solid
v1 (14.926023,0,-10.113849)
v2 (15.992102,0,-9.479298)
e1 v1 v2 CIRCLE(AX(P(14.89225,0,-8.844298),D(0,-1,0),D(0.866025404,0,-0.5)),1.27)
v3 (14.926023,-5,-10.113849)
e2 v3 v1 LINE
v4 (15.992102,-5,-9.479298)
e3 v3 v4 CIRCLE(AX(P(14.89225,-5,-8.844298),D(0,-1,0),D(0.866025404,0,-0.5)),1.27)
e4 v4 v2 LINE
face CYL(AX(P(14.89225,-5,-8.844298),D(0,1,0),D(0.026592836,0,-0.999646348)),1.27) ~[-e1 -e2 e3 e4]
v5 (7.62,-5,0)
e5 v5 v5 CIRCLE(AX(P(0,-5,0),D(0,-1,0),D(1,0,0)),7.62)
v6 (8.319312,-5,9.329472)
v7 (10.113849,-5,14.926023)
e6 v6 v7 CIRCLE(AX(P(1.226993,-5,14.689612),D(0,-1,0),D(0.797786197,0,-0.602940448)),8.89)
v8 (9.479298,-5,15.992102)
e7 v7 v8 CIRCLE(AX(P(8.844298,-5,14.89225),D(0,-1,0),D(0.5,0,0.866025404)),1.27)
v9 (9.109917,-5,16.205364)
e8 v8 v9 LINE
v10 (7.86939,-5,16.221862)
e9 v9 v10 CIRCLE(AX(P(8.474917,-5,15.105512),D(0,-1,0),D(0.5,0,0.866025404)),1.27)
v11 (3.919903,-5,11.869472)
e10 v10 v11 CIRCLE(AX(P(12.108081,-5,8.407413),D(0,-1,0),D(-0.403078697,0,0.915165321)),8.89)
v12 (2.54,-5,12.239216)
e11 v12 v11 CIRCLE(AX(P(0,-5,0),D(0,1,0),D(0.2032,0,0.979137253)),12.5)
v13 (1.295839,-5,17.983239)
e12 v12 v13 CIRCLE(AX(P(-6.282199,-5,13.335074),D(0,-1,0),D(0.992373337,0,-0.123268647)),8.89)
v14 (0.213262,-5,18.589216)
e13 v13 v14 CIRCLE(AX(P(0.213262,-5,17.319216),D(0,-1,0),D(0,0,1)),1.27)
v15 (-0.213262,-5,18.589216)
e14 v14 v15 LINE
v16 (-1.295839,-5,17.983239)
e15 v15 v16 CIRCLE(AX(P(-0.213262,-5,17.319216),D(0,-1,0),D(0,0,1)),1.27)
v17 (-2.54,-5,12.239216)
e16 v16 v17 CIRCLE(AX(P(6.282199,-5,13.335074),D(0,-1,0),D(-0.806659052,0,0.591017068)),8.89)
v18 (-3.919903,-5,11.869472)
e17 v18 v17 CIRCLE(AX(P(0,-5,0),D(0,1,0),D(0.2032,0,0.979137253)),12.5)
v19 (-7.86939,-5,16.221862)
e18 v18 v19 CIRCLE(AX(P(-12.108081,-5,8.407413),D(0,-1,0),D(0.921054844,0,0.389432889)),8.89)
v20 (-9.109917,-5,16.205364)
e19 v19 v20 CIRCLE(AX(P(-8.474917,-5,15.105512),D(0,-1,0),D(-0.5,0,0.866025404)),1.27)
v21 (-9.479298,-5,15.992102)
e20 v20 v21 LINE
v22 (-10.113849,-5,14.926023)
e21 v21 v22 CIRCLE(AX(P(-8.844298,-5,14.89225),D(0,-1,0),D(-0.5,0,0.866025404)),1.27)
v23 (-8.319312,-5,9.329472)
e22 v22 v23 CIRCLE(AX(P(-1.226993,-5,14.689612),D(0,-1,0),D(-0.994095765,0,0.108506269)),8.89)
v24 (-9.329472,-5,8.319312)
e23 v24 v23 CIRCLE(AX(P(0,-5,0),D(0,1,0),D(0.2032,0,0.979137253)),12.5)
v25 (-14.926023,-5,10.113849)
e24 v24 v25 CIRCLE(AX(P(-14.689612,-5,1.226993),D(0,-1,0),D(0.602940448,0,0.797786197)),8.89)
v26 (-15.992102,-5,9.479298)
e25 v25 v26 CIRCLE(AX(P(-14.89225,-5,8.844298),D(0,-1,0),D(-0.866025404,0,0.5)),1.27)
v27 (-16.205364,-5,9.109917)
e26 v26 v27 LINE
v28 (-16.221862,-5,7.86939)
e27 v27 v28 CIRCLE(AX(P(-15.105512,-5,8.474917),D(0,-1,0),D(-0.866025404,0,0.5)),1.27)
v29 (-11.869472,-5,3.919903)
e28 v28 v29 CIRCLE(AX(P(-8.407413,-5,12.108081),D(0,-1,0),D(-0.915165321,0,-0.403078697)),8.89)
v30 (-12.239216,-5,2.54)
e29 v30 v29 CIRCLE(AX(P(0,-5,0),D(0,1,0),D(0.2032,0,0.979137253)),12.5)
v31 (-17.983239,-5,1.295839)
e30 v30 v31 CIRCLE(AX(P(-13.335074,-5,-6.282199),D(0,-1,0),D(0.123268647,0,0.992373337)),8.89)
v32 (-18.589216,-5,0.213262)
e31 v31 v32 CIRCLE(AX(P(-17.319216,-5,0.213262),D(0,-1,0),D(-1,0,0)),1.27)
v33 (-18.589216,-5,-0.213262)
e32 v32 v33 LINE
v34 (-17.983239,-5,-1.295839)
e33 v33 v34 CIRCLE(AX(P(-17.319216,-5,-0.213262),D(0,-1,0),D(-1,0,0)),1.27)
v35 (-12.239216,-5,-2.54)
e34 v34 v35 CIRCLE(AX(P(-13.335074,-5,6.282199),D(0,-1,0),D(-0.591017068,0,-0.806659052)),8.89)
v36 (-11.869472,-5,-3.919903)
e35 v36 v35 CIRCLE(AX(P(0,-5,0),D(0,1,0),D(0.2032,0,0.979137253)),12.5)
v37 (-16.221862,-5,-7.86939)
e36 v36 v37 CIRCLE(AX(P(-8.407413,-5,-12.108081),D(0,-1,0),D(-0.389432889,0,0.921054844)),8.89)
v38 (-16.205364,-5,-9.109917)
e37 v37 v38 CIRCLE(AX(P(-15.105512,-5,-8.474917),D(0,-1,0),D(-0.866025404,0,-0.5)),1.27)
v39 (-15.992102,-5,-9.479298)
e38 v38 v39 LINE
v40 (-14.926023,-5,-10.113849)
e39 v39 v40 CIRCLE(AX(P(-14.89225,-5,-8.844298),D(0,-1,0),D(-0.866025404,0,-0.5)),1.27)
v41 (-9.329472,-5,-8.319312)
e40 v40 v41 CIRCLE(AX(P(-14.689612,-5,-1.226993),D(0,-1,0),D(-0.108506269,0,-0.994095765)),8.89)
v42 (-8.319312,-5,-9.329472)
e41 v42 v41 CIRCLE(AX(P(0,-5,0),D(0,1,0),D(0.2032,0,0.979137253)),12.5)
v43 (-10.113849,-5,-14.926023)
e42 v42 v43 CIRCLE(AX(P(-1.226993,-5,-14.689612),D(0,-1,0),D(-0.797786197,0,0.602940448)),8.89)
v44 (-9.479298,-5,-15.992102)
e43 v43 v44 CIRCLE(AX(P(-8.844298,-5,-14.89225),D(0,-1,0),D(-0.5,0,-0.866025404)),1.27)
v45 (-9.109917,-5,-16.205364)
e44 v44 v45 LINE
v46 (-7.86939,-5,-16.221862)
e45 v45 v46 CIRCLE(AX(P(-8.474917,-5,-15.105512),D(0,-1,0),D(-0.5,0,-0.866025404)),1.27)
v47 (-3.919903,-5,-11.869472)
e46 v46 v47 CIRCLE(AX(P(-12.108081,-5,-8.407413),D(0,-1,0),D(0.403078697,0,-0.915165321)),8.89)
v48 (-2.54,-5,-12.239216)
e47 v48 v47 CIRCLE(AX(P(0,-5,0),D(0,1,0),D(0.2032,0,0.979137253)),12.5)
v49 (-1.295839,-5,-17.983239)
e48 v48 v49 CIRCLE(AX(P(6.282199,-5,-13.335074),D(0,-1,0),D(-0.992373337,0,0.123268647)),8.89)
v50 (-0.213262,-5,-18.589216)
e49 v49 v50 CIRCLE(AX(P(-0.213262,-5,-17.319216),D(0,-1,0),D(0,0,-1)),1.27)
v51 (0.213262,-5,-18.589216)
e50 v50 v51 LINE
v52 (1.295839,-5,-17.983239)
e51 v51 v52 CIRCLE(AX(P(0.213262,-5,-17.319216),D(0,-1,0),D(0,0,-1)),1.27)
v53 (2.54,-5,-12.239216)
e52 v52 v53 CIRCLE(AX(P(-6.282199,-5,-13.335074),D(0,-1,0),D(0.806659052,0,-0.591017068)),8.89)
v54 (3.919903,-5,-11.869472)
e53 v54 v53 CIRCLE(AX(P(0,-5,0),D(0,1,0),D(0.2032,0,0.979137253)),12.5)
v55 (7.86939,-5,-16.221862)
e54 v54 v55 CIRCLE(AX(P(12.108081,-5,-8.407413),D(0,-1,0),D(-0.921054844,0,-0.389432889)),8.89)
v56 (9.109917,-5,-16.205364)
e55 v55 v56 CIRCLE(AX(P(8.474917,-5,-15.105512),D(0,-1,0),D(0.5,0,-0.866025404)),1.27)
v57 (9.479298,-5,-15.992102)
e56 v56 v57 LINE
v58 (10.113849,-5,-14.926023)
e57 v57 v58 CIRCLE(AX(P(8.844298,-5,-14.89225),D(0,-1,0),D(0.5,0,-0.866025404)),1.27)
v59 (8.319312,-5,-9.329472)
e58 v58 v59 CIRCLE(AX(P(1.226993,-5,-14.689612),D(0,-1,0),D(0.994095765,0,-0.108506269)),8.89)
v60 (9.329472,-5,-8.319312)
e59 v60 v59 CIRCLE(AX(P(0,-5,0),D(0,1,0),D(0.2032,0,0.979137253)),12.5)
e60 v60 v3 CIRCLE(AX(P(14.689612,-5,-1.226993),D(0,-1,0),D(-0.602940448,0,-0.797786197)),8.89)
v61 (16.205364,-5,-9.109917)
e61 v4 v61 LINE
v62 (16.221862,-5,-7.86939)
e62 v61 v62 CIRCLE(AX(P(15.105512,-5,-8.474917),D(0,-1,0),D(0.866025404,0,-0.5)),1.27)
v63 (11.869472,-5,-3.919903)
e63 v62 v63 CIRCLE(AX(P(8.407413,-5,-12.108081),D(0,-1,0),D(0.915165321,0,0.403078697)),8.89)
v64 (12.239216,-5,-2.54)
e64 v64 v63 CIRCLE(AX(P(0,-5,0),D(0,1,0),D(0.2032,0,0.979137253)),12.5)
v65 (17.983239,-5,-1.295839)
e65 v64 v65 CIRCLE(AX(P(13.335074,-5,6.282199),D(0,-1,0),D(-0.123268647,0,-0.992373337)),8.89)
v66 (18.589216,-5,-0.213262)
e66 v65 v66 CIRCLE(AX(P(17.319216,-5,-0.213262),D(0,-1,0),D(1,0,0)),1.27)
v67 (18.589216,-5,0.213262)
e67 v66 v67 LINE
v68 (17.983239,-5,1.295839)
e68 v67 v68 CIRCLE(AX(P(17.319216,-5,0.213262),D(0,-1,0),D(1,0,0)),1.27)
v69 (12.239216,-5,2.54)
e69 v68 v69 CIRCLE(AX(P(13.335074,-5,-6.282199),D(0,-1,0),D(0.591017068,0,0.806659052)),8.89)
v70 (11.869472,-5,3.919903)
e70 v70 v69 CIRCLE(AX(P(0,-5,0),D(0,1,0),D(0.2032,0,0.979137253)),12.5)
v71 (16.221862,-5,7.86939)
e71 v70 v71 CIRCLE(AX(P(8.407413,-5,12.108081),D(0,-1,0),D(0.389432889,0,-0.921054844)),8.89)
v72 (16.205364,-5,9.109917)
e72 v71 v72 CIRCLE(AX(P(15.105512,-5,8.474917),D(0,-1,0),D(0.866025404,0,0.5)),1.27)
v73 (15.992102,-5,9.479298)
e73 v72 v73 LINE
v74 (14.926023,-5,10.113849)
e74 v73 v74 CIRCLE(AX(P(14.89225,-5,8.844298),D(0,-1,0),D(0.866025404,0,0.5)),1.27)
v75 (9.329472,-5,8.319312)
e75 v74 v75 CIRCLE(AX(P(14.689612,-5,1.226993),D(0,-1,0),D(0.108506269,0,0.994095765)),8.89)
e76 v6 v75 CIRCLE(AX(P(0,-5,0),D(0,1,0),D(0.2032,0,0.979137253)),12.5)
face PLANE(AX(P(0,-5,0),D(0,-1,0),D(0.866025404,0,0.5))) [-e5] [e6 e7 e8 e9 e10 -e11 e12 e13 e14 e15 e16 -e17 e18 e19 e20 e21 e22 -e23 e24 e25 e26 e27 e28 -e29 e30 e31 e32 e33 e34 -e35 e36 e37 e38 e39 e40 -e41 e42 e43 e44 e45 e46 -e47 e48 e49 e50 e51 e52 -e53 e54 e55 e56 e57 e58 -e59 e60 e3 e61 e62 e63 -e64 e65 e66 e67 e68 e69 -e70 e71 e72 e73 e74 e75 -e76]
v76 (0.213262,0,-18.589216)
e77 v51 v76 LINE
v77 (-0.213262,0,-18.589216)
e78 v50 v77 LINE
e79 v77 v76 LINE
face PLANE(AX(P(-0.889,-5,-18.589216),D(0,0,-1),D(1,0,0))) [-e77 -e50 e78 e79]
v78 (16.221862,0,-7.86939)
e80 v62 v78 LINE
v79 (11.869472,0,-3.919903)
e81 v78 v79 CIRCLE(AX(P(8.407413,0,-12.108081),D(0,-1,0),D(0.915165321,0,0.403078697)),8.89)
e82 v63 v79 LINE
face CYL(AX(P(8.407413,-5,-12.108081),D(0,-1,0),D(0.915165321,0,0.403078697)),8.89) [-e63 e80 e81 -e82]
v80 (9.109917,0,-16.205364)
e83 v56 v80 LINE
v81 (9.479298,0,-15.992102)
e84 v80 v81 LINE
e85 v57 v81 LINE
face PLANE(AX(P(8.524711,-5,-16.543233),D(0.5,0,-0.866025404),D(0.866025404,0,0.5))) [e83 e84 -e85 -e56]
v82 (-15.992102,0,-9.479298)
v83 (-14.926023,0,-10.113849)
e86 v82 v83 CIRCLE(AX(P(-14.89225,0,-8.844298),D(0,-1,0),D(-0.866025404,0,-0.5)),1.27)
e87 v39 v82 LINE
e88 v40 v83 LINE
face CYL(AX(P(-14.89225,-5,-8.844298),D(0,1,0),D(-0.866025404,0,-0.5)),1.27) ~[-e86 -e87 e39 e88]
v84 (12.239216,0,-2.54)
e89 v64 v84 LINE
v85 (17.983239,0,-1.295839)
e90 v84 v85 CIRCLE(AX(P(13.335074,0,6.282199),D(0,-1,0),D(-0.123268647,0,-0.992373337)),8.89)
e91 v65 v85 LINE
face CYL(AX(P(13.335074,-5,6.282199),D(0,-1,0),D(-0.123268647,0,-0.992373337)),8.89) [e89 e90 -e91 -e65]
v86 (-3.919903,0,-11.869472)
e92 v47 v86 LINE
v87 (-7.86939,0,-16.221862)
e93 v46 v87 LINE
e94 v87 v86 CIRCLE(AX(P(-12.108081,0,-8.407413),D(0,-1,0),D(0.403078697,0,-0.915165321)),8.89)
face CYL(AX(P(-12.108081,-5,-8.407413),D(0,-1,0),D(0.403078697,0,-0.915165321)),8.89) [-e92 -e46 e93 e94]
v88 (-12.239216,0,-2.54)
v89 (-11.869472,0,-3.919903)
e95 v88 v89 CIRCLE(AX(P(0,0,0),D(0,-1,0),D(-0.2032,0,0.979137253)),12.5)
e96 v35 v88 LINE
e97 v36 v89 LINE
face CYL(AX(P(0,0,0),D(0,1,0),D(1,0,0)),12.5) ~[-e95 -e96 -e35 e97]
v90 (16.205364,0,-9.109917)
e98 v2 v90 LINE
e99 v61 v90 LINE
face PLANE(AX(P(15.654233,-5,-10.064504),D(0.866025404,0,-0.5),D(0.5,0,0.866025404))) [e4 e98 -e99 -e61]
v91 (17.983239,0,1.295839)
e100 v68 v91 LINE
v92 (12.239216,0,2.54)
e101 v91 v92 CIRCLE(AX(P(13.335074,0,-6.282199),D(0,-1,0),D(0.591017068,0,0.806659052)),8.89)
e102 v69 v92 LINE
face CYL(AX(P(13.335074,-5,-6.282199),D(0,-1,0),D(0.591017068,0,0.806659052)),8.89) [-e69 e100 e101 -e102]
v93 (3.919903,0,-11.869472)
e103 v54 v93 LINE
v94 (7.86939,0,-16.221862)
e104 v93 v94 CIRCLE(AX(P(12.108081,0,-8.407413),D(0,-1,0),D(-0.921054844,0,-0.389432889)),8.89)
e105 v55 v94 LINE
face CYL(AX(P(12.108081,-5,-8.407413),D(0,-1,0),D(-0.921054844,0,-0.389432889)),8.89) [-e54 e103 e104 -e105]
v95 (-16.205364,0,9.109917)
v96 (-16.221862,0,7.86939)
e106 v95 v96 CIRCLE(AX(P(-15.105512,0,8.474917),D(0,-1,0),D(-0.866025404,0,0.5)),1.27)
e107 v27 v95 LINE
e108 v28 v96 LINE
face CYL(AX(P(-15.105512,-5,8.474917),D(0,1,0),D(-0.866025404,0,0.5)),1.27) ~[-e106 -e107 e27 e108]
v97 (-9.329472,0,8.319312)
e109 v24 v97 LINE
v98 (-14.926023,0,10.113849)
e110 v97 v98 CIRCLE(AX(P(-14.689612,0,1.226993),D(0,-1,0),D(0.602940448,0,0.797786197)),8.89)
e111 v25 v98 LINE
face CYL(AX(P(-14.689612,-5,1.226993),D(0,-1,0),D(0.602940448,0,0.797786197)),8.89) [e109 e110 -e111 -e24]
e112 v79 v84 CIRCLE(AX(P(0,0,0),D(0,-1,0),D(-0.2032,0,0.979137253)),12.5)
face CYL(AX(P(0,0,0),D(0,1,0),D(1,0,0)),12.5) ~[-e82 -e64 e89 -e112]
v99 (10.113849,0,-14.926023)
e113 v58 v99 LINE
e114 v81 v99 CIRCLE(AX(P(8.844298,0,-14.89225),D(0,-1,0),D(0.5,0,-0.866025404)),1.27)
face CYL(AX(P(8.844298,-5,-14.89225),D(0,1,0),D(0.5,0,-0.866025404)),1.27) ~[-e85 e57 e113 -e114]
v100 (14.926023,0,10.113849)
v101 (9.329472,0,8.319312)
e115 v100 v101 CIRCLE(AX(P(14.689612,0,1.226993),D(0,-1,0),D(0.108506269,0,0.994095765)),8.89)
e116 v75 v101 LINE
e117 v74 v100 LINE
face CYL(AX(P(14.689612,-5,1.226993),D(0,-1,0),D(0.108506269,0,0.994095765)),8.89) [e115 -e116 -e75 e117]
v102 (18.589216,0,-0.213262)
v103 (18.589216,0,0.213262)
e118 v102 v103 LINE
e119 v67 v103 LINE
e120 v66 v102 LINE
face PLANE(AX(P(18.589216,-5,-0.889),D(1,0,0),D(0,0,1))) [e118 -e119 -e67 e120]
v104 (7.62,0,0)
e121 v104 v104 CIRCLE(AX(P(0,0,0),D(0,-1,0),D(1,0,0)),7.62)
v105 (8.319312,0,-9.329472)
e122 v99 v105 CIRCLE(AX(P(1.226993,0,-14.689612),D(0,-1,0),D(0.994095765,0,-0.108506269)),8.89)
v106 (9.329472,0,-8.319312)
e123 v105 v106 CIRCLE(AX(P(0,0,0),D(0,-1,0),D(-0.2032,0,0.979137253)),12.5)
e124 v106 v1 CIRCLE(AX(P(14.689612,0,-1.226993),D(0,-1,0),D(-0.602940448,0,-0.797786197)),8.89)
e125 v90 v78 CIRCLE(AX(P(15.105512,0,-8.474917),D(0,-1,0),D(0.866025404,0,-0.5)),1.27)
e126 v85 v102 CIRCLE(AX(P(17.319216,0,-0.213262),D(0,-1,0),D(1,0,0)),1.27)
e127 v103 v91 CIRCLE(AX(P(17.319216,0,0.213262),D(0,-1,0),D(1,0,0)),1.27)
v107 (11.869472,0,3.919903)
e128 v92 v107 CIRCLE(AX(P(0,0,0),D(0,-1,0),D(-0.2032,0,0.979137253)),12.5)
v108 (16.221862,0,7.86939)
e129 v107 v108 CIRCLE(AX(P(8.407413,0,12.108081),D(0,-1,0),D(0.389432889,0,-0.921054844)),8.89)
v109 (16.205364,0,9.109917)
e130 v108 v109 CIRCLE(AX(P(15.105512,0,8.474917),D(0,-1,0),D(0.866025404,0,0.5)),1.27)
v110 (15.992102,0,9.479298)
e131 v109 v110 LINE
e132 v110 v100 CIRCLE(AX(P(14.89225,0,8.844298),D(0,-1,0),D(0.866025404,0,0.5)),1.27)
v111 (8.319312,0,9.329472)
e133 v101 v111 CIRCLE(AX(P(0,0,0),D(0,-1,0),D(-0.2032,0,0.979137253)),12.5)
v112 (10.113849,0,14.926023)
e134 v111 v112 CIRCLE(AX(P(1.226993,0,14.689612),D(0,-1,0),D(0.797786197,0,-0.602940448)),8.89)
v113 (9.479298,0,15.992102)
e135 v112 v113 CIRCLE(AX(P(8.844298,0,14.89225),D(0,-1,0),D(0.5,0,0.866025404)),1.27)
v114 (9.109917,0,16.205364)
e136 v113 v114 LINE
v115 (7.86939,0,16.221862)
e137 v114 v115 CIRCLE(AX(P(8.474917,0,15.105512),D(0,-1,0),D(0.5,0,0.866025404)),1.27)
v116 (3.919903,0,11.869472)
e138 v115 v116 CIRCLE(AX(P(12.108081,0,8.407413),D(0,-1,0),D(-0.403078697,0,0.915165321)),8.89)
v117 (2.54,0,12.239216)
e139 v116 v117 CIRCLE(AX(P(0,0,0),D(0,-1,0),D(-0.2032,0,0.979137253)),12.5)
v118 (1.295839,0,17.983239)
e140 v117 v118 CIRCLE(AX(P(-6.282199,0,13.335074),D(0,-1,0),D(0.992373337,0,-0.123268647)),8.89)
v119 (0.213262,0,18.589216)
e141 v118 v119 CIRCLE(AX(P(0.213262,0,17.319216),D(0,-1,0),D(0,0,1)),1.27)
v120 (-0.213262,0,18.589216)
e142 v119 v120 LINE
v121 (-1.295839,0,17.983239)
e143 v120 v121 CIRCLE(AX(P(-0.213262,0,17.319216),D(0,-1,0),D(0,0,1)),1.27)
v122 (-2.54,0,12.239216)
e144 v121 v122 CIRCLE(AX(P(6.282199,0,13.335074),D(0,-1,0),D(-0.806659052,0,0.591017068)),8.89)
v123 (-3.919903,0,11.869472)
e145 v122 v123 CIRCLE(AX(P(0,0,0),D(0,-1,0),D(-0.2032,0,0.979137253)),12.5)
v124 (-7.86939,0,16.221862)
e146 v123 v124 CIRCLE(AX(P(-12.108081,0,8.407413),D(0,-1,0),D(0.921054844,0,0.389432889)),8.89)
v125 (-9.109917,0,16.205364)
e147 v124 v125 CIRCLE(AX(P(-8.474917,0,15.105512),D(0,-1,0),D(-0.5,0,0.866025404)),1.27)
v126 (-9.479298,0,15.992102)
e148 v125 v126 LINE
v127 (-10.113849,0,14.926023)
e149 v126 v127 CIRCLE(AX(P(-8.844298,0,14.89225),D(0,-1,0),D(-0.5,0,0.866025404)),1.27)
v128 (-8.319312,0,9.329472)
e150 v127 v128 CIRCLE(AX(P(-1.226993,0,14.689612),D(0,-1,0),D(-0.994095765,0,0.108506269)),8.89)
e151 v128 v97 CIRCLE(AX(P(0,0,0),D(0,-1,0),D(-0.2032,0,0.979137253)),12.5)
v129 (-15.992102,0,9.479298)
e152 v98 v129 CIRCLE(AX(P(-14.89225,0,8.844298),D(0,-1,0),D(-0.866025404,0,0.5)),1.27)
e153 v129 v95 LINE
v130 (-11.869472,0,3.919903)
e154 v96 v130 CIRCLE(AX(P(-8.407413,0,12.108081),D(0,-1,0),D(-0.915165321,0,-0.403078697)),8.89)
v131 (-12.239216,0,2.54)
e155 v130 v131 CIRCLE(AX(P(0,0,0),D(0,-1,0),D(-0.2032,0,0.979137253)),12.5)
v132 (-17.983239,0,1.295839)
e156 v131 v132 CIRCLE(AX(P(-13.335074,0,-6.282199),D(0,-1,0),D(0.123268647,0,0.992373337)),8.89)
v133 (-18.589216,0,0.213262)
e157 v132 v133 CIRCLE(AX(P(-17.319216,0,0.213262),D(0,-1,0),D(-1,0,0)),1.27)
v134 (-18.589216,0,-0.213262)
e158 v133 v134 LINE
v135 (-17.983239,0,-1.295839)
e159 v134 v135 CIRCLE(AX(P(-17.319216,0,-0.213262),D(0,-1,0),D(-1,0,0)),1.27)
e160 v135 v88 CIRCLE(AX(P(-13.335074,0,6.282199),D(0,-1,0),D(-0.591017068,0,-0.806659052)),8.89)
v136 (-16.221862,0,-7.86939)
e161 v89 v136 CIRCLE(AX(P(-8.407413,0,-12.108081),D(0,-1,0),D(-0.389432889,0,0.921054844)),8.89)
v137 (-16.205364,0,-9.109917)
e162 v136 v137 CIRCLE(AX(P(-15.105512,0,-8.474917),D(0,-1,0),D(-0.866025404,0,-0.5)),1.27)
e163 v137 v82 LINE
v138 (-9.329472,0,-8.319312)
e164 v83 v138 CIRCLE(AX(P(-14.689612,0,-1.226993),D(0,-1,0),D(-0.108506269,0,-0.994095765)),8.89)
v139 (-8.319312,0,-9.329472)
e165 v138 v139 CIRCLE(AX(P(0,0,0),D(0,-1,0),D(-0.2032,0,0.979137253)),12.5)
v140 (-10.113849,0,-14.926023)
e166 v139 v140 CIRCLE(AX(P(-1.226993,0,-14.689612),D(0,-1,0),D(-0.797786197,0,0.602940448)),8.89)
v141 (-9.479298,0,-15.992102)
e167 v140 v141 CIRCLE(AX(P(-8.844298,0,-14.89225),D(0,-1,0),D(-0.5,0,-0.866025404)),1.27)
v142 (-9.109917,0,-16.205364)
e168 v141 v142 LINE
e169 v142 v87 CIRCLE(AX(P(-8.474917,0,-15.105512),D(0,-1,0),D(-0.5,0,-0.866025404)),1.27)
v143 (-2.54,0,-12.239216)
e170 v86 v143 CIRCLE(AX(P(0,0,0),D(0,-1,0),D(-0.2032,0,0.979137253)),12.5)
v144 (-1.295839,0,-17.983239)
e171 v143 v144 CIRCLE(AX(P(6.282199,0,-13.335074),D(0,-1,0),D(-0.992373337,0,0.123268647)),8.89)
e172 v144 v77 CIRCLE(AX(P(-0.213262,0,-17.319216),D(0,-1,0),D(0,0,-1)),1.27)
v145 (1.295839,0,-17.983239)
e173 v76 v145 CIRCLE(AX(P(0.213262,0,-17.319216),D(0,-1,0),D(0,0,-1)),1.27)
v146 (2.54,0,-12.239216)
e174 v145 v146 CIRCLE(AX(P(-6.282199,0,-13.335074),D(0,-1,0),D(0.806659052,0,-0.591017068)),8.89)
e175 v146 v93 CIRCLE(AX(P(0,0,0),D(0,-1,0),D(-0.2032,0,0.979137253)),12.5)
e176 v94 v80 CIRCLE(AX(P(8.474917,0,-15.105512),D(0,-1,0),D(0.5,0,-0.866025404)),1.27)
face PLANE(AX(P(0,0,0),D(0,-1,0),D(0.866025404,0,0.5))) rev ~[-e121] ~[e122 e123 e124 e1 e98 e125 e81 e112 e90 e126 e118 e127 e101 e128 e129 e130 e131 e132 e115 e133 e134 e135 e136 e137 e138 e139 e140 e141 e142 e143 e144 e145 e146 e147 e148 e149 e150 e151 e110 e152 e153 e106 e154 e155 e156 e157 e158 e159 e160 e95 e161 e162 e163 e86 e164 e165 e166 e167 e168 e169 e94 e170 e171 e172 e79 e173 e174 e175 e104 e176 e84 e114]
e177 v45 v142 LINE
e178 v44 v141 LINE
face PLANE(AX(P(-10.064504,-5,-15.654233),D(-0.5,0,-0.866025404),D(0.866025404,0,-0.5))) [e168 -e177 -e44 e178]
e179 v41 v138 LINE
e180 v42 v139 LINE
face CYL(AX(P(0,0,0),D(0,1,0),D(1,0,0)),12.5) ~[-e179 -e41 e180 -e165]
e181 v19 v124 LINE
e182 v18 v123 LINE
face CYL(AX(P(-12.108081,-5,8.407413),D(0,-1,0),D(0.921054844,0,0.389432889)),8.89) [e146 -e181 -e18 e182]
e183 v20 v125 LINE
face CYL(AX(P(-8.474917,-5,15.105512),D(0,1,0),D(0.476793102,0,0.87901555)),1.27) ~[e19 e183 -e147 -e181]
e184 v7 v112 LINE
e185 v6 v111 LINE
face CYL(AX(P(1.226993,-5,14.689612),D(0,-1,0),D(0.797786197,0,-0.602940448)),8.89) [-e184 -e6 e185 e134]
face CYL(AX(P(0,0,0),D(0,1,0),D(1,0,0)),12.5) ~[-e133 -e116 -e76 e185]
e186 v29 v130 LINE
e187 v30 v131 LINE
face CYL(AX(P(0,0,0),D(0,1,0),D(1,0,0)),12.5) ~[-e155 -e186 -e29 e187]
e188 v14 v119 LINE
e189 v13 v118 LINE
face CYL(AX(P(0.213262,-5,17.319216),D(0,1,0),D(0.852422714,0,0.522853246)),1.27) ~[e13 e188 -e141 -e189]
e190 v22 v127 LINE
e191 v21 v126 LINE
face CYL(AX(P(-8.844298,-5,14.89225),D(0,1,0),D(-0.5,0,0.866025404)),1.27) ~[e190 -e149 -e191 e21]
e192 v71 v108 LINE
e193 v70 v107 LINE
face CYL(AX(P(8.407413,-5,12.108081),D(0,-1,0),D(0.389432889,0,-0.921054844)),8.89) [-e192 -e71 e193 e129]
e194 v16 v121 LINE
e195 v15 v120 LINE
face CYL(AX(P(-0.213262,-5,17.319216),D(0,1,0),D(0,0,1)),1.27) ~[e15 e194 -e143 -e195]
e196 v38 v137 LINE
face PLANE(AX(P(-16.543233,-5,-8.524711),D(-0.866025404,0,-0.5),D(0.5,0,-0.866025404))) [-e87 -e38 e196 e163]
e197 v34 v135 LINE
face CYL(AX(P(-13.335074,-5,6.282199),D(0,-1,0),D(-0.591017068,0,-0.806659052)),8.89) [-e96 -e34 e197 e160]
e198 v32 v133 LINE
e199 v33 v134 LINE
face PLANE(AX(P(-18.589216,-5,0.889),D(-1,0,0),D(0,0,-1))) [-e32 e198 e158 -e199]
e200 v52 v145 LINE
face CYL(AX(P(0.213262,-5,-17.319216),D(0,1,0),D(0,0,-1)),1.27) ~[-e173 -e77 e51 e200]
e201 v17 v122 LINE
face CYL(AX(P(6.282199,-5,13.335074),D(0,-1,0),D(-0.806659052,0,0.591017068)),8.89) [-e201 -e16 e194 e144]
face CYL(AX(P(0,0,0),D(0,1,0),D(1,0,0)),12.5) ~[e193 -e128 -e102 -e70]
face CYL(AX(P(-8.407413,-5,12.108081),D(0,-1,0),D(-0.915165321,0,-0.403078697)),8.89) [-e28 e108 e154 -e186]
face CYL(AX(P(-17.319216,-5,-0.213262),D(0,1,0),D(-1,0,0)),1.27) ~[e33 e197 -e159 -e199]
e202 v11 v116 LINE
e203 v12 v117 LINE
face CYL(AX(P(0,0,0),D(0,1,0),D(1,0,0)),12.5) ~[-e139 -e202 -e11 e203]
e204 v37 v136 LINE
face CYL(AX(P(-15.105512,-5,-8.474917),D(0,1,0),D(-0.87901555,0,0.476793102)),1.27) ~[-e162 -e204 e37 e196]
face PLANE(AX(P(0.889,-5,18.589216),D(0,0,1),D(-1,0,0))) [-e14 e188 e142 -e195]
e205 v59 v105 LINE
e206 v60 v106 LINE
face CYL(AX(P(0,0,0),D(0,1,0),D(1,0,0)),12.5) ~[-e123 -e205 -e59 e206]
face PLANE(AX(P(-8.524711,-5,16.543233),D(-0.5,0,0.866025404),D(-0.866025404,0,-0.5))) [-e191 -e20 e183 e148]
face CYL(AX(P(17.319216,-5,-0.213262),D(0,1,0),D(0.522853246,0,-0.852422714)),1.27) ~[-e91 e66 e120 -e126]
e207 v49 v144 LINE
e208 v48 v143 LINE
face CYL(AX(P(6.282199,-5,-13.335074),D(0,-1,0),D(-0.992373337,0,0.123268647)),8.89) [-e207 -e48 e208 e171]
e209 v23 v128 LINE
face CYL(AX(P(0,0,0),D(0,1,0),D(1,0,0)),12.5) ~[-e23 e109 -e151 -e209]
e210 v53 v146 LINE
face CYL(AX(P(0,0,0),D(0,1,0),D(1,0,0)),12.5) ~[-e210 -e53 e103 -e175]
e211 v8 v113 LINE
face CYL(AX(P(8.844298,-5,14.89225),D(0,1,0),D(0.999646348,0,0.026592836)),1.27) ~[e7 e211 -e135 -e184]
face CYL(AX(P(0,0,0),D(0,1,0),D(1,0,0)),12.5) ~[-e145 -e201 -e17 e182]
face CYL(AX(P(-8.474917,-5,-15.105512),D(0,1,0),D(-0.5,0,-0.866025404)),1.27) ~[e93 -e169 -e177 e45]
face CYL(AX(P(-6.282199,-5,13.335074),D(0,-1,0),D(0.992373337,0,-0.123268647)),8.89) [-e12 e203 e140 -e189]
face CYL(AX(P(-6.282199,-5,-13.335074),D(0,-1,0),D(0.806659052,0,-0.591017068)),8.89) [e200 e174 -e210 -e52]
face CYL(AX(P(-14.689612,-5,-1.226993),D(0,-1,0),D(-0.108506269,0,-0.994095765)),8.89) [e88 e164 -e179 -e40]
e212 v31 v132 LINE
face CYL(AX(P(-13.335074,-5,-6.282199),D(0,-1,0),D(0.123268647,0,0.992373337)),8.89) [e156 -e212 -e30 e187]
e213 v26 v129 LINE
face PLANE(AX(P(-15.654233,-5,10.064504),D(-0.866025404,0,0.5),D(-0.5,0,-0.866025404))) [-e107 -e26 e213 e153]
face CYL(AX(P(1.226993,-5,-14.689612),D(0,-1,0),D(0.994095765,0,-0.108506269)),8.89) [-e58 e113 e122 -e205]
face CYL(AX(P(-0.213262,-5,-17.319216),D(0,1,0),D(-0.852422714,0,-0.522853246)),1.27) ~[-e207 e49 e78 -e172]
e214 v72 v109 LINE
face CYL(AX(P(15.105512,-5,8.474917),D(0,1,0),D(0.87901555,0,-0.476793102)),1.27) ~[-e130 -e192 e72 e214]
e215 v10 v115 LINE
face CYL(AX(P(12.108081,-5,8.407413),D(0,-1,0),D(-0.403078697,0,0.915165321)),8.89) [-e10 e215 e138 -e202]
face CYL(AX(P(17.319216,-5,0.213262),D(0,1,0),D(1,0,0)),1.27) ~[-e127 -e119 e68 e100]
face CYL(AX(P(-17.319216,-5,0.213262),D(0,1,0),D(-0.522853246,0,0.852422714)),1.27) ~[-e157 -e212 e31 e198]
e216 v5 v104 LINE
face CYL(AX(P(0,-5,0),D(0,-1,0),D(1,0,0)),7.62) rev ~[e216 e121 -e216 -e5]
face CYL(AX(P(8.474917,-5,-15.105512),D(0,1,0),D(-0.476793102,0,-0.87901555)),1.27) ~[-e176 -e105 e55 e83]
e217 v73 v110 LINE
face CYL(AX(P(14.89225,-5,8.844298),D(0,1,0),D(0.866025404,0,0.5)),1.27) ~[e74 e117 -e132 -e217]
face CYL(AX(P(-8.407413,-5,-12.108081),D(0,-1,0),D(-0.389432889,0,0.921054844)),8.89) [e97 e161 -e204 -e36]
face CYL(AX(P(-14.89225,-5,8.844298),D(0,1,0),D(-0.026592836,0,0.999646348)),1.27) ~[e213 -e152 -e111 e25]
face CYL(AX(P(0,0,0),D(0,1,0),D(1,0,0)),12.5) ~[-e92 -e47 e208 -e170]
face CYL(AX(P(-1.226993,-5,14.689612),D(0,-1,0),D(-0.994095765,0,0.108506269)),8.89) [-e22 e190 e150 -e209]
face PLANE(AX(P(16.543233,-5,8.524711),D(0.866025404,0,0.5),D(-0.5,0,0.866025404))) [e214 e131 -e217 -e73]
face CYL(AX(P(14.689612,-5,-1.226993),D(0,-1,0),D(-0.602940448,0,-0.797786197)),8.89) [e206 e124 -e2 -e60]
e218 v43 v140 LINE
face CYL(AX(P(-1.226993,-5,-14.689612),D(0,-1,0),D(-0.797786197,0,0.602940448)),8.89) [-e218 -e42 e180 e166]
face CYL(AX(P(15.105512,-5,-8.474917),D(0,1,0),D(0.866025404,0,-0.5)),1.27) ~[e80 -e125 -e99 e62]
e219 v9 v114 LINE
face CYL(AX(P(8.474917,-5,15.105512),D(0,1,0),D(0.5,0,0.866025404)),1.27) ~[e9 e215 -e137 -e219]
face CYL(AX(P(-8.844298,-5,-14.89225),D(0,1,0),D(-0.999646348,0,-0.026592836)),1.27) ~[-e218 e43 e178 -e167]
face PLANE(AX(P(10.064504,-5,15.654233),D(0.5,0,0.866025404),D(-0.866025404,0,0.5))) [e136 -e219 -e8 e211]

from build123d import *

# Parameters (mm, degrees)
F0_R     = 12.5
F1_DEPTH = 5
F3_DEPTH = 5
F4_R     = 1.27
F5_COUNT = 12
F6_R     = 7.62
F7_DEPTH = 25.4


with BuildPart() as f1:
    # F0 (on Front) → F1 (new body)
    with BuildSketch(Plane.XZ):
        Circle(F0_R)
    extrude(amount=F1_DEPTH)

    # F2 (on face) → F3 (join, through all)
    with BuildSketch(Plane.XZ.offset(5)):
        with BuildLine():
            ThreePointArc((-2.54, 12.2392156611), (0, 12.5), (2.54, 12.2392156611))
            ThreePointArc((2.54, 12.2392156611), (2.3217431159, 15.5720988713), (0.889, 18.5892156611))
            Line((0.889, 18.5892156611), (-0.889, 18.5892156611))
            ThreePointArc((-0.889, 18.5892156611), (-2.3217431159, 15.5720988713), (-2.54, 12.2392156611))
        make_face()
    extrude(amount=-F3_DEPTH)

    # F4
    f4_edges = [f1.edges().sort_by_distance(p)[0] for p in [
        (-0.889, -2.5, 18.589216),
        (0.889, -2.5, 18.589216),
    ]]
    fillet(f4_edges, radius=F4_R)

    # F5: F1 ×12 about axis
    f5_axis = Axis((0, 0, 0), (0, 1, 0))


with BuildPart() as f1_1:
    add(f1.part)
    for i in range(1, F5_COUNT):
        add(f1.part.rotate(f5_axis, i * 360 / F5_COUNT))

    # F6 (on face) → F7 (cut)
    with BuildSketch(Plane.XZ.offset(5)):
        Circle(F6_R)
    extrude(amount=-F7_DEPTH, mode=Mode.SUBTRACT)


solid = f1_1.part
